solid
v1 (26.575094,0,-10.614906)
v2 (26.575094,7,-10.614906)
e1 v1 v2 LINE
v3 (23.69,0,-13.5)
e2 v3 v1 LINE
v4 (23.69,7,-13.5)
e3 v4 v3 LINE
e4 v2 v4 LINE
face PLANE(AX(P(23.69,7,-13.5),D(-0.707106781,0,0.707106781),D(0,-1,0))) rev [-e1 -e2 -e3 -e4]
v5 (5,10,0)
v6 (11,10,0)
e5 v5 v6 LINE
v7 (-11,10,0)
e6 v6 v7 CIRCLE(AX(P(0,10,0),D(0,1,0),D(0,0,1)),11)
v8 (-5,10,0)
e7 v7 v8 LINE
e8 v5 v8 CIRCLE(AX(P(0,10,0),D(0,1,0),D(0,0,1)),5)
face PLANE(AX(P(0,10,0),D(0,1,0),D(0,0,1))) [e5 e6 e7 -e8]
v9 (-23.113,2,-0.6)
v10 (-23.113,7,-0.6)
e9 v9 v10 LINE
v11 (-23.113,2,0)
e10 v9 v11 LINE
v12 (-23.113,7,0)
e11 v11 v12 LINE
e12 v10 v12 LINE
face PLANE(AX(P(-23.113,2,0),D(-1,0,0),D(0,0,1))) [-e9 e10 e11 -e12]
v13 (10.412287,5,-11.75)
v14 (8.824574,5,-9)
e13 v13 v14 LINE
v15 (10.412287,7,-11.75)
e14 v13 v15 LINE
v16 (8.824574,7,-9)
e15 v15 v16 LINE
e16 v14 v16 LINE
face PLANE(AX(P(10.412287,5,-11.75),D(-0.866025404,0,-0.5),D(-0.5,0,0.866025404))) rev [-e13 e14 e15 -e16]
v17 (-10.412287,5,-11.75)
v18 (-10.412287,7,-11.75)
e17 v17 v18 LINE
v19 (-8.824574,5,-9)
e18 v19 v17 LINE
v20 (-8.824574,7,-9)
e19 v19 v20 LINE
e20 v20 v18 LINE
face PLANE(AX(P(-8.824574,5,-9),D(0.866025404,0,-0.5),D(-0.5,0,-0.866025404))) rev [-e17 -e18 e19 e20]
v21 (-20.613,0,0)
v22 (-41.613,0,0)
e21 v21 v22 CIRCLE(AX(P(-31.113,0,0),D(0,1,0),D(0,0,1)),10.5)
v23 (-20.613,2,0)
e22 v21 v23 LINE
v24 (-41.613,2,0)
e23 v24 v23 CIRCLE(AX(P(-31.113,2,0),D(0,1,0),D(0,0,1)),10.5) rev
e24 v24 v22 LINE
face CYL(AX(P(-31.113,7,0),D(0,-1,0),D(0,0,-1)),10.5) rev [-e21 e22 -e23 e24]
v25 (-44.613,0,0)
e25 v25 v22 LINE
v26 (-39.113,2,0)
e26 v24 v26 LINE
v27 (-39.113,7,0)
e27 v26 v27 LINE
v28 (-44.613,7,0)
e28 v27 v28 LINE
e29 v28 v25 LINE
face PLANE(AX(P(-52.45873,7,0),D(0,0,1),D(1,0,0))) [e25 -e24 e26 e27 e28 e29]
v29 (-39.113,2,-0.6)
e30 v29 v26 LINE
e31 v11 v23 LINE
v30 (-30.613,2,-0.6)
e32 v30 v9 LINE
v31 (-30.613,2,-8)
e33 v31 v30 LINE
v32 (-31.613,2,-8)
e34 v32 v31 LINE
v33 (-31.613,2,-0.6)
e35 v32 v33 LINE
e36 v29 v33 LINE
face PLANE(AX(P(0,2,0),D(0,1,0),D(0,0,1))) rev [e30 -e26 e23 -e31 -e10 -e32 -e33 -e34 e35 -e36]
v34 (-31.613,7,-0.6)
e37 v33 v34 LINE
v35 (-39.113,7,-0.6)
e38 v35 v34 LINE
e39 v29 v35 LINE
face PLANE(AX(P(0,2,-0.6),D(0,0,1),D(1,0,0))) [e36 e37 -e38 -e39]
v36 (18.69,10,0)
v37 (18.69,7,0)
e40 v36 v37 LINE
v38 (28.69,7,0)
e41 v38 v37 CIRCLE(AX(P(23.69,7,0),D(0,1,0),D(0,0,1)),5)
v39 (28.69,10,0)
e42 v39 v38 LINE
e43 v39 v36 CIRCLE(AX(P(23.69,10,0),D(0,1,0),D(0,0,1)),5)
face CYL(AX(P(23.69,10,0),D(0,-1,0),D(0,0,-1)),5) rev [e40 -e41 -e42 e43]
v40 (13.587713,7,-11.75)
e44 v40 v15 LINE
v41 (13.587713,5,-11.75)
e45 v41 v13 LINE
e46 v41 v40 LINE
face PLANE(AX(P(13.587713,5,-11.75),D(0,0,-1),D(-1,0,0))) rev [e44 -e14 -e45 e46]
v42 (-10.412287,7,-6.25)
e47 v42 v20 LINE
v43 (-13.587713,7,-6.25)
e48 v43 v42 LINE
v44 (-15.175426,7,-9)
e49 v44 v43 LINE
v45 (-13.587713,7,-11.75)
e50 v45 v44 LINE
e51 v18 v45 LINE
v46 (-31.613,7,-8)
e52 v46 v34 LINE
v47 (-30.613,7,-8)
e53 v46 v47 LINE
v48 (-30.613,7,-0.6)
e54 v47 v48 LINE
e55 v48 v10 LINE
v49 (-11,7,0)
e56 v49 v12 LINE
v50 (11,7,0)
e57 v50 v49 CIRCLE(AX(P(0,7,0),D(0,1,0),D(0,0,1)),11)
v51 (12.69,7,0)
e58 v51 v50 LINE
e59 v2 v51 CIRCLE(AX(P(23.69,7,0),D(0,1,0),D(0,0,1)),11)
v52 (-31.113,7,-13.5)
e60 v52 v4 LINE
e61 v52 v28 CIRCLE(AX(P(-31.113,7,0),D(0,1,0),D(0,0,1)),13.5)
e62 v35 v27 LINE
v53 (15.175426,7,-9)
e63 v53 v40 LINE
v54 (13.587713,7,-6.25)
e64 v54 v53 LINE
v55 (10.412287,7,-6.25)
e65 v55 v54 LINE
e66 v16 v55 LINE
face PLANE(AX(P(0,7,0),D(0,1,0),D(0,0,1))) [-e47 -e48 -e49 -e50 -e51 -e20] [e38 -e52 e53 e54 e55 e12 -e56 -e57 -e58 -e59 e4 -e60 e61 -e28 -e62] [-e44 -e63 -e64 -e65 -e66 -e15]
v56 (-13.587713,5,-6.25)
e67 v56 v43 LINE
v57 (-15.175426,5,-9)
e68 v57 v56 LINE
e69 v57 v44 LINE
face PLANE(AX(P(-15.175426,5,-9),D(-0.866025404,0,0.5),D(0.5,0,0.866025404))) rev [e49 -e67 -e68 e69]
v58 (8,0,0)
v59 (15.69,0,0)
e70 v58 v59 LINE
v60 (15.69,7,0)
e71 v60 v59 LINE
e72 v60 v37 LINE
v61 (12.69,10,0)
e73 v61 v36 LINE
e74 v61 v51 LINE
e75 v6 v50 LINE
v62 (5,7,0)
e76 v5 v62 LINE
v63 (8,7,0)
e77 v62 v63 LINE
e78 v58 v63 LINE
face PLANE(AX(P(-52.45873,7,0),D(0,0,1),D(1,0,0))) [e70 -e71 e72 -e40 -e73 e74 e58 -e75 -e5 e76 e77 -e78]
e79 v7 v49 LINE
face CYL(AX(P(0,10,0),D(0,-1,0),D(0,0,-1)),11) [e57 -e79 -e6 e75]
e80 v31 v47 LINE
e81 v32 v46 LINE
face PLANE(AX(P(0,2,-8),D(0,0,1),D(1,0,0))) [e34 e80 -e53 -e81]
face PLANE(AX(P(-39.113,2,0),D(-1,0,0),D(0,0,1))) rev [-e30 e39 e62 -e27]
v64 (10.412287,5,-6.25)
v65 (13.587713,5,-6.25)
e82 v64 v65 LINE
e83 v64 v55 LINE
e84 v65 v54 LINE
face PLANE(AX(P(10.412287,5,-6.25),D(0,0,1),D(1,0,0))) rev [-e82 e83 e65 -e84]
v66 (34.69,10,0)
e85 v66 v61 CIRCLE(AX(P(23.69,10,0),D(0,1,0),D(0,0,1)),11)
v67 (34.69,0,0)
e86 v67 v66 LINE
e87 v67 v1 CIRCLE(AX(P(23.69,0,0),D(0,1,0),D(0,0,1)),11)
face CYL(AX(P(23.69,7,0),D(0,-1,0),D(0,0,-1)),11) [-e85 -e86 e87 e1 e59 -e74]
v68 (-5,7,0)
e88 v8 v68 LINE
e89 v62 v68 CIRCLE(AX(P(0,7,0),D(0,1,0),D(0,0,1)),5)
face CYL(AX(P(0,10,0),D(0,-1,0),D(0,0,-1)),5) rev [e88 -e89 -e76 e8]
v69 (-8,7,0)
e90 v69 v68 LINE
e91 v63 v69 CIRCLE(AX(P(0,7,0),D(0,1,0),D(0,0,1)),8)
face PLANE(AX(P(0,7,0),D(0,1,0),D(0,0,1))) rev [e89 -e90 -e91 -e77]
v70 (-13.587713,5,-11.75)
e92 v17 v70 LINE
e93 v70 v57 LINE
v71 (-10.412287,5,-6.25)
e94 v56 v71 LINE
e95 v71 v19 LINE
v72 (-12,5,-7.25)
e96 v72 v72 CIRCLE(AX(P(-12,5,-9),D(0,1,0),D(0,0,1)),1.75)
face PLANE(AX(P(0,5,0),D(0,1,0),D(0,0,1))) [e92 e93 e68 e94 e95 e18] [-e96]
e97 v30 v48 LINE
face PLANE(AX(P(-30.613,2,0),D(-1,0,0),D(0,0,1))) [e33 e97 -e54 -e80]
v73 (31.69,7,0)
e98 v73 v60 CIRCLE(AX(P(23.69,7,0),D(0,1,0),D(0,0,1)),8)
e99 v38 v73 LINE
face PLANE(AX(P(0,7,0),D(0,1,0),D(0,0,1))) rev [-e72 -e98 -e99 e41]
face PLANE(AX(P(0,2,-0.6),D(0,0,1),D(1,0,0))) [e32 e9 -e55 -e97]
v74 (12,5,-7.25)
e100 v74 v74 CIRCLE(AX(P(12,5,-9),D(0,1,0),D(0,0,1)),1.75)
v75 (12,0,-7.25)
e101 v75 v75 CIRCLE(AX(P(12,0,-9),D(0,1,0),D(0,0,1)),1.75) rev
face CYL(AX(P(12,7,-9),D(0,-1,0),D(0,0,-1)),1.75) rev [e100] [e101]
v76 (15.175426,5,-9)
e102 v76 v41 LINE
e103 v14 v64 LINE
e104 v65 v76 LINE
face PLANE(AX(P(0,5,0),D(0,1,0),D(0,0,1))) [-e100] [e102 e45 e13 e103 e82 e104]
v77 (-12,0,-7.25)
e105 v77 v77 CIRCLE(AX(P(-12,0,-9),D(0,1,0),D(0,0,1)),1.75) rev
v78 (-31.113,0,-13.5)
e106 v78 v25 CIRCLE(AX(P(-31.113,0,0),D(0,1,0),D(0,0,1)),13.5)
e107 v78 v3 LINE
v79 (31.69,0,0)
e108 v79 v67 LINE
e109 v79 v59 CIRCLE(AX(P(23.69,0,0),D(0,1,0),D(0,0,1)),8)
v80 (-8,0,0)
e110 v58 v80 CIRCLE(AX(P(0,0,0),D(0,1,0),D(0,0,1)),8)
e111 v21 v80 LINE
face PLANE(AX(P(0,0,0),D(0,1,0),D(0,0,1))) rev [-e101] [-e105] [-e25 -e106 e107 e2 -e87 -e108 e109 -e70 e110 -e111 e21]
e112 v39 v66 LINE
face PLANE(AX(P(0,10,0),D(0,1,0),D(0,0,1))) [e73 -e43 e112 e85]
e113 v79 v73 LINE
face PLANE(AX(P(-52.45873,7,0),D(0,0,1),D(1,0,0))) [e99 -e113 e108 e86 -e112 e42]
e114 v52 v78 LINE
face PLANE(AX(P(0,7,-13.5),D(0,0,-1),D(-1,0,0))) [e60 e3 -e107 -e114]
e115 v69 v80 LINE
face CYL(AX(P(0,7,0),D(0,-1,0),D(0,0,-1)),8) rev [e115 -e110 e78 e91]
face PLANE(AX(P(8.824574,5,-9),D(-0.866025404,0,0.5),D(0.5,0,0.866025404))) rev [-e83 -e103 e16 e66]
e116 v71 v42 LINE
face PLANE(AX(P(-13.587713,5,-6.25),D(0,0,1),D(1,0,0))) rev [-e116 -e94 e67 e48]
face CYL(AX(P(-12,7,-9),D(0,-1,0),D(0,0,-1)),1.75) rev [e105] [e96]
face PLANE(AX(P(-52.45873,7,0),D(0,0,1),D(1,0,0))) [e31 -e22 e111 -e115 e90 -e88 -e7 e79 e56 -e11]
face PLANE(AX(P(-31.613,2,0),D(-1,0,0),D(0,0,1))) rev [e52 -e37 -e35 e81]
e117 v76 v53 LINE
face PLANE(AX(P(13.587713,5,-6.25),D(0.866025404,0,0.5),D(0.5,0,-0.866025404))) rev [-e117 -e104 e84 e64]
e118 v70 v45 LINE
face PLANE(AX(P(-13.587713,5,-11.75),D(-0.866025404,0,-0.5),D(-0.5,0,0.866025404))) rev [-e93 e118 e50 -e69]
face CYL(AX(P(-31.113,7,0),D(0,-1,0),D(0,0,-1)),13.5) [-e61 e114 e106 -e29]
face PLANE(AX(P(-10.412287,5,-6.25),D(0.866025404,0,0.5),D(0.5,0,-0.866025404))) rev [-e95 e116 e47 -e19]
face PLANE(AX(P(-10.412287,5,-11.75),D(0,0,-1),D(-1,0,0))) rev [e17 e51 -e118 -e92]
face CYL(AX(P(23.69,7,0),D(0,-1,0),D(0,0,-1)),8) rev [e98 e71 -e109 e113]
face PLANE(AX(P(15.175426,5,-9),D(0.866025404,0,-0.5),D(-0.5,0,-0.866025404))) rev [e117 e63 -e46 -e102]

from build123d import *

# Parameters (mm, degrees)
SKETCH3_R               = 8
SKETCH3_W               = 54.803
SKETCH3_H               = 32
SKETCH3_R_2             = 5
BOSS_EXTRUDE1_DEPTH     = 7
CUT_EXTRUDE3_DEPTH      = 65.105926161
CUT_EXTRUDE3_DEPTH_BACK = 65.105926161
SKETCH4_R               = 1.75
CHAMFER1_SIZE           = 2.5
CUT_EXTRUDE5_DEPTH      = 65.105926161
CUT_EXTRUDE5_DEPTH_BACK = 65.105926161
SKETCH9_R               = 1.75
CUT_EXTRUDE6_START      = -2
SKETCH10_R              = 1.75
CUT_EXTRUDE6_DEPTH      = 2
CHAMFER3_SIZE2          = 22
CHAMFER3_SIZE           = 32
CHAMFER4_SIZE           = 16
FILLET1_DEPTH           = 7
BOSS_EXTRUDE6_START     = -5
SKETCH15_R              = 10.5
BOSS_EXTRUDE6_DEPTH     = 5
CUT_EXTRUDE7_DEPTH      = 65.105926161
CUT_EXTRUDE7_DEPTH_BACK = 65.105926161
SKETCH16_W              = 114.08603318
SKETCH16_H              = 61.147895568
BOSS_EXTRUDE7_DEPTH     = 3


with BuildPart() as part:
    # Sketch3 → Boss-Extrude1 (new body)
    # profile 1 of 10: a face of its own
    with BuildSketch(Plane(origin=(0, 0, 0), x_dir=(1, 0, 0), z_dir=(0, 1, 0))):
        with BuildLine():
            ThreePointArc((-17.613, 0), (-21.567058454, 9.545941546), (-31.113, 13.5))
            Line((-31.113, 13.5), (-31.113, 10.5))
            ThreePointArc((-31.113, 10.5), (-23.688378798, 7.424621202), (-20.613, 0))
            ThreePointArc((-20.613, 0), (-23.688378798, -7.424621202), (-31.113, -10.5))
            Line((-31.113, -10.5), (-31.113, -13.5))
            ThreePointArc((-31.113, -13.5), (-21.567058454, -9.545941546), (-17.613, 0))
        make_face()
    # profile 2 of 10: a face of its own
    with BuildSketch(Plane(origin=(0, 0, 0), x_dir=(1, 0, 0), z_dir=(0, 1, 0))):
        with BuildLine():
            Line((-31.113, 10.5), (-31.113, 13.5))
            ThreePointArc((-31.113, 13.5), (-44.613, 0), (-31.113, -13.5))
            Line((-31.113, -13.5), (-31.113, -10.5))
            ThreePointArc((-31.113, -10.5), (-41.613, 0), (-31.113, 10.5))
        make_face()
    # profile 3 of 10: a face of its own
    with BuildSketch(Plane(origin=(0, 0, 0), x_dir=(1, 0, 0), z_dir=(0, 1, 0))):
        with BuildLine():
            Line((23.69, 13.5), (-31.113, 13.5))
            ThreePointArc((-31.113, 13.5), (-21.567058454, 9.545941546), (-17.613, 0))
            ThreePointArc((-17.613, 0), (-21.567058454, -9.545941546), (-31.113, -13.5))
            Line((-31.113, -13.5), (23.69, -13.5))
            Line((23.69, -13.5), (23.69, -11))
            ThreePointArc((23.69, -11), (12.69, 0), (23.69, 11))
            Line((23.69, 11), (23.69, 13.5))
        make_face()
        with Locations(Location((0, 0, 0), (0, 0, 270))):
            Circle(SKETCH3_R, mode=Mode.SUBTRACT)
    # profile 4 of 10: a face of its own
    with BuildSketch(Plane(origin=(0, 0, 0), x_dir=(1, 0, 0), z_dir=(0, 1, 0))):
        with BuildLine():
            ThreePointArc((-17.613, 0), (-21.567058454, 9.545941546), (-31.113, 13.5))
            Line((-31.113, 13.5), (-31.113, 10.5))
            ThreePointArc((-31.113, 10.5), (-23.688378798, 7.424621202), (-20.613, 0))
            ThreePointArc((-20.613, 0), (-23.688378798, -7.424621202), (-31.113, -10.5))
            Line((-31.113, -10.5), (-31.113, -13.5))
            ThreePointArc((-31.113, -13.5), (-21.567058454, -9.545941546), (-17.613, 0))
        make_face()
    # profile 5 of 10: a face of its own
    with BuildSketch(Plane(origin=(0, 0, 0), x_dir=(1, 0, 0), z_dir=(0, 1, 0))):
        with BuildLine():
            Line((-31.113, 10.5), (-31.113, 13.5))
            ThreePointArc((-31.113, 13.5), (-44.613, 0), (-31.113, -13.5))
            Line((-31.113, -13.5), (-31.113, -10.5))
            ThreePointArc((-31.113, -10.5), (-41.613, 0), (-31.113, 10.5))
        make_face()
    # profile 6 of 10: a face of its own
    with BuildSketch(Plane(origin=(0, 0, 0), x_dir=(1, 0, 0), z_dir=(0, 1, 0))):
        with BuildLine():
            ThreePointArc((34.69, 0), (31.468174593, 7.778174593), (23.69, 11))
            Line((23.69, 11), (23.69, 8))
            ThreePointArc((23.69, 8), (29.346854249, 5.656854249), (31.69, 0))
            ThreePointArc((31.69, 0), (29.346854249, -5.656854249), (23.69, -8))
            Line((23.69, -8), (23.69, -11))
            ThreePointArc((23.69, -11), (31.468174593, -7.778174593), (34.69, 0))
        make_face()
    # profile 7 of 10: a face of its own
    with BuildSketch(Plane(origin=(0, 0, 0), x_dir=(1, 0, 0), z_dir=(0, 1, 0))):
        with BuildLine():
            Line((23.69, 8), (23.69, 11))
            ThreePointArc((23.69, 11), (12.69, 0), (23.69, -11))
            Line((23.69, -11), (23.69, -8))
            ThreePointArc((23.69, -8), (15.69, 0), (23.69, 8))
        make_face()
    # profile 8 of 10: a face of its own
    with BuildSketch(Plane(origin=(0, 0, 0), x_dir=(1, 0, 0), z_dir=(0, 1, 0))):
        with Locations((-3.7115, -29.5)):
            Rectangle(SKETCH3_W, SKETCH3_H)
        with Locations(Location((0, -32.707574931, 0), (0, 0, 270))):
            Circle(SKETCH3_R_2, mode=Mode.SUBTRACT)
    # profile 9 of 10: a face of its own
    with BuildSketch(Plane(origin=(0, 0, 0), x_dir=(1, 0, 0), z_dir=(0, 1, 0))):
        with BuildLine():
            ThreePointArc((34.69, 0), (31.468174593, 7.778174593), (23.69, 11))
            Line((23.69, 11), (23.69, 8))
            ThreePointArc((23.69, 8), (29.346854249, 5.656854249), (31.69, 0))
            ThreePointArc((31.69, 0), (29.346854249, -5.656854249), (23.69, -8))
            Line((23.69, -8), (23.69, -11))
            ThreePointArc((23.69, -11), (31.468174593, -7.778174593), (34.69, 0))
        make_face()
    # profile 10 of 10: a face of its own
    with BuildSketch(Plane(origin=(0, 0, 0), x_dir=(1, 0, 0), z_dir=(0, 1, 0))):
        with BuildLine():
            Line((23.69, 8), (23.69, 11))
            ThreePointArc((23.69, 11), (12.69, 0), (23.69, -11))
            Line((23.69, -11), (23.69, -8))
            ThreePointArc((23.69, -8), (15.69, 0), (23.69, 8))
        make_face()
    extrude(amount=BOSS_EXTRUDE1_DEPTH)

    # Sketch4 → Cut-Extrude3 (cut, two sides: drawn at the far end of the back side and taken through both)
    with BuildSketch(Plane(origin=(0, 0, 0), x_dir=(1, 0, 0), z_dir=(0, 1, 0)).offset(-CUT_EXTRUDE3_DEPTH_BACK)):
        with Locations(Location((5.5, -27.207574931, 0), (0, 0, 270))):
            Circle(SKETCH4_R)
        with Locations(Location((5.5, -38.207574931, 0), (0, 0, 270))):
            Circle(SKETCH4_R)
        with Locations(Location((-5.5, -38.207574931, 0), (0, 0, 270))):
            Circle(SKETCH4_R)
        with Locations(Location((-5.5, -27.207574931, 0), (0, 0, 270))):
            Circle(SKETCH4_R)
    extrude(amount=CUT_EXTRUDE3_DEPTH + CUT_EXTRUDE3_DEPTH_BACK, mode=Mode.SUBTRACT)

    # Chamfer1
    # the kernel refuses this chamfer: 2.5 mm, written as the material it adds along each edge
    with BuildSketch(Plane(origin=(23.69, 0, -11), x_dir=(0, 0, -1), z_dir=(0, 1, 0))) as chamfer1_piece_1_section:
        with BuildLine():
            Line((CHAMFER1_SIZE, 0), (-0.385093792, -2.885093792))
            ThreePointArc((-0.385093792, -2.885093792), (-0.102088007, -1.495163601), (0, 0))
            Line((0, 0), (CHAMFER1_SIZE, 0))
        make_face()
    chamfer1_piece_1 = extrude(amount=7, mode=Mode.PRIVATE)
    chamfer1_piece_1 = split(chamfer1_piece_1, bisect_by=Plane(origin=(23.69, 0, -13.5), z_dir=(0, 0, 1)), keep=Keep.TOP, mode=Mode.PRIVATE)
    add(chamfer1_piece_1)

    # Sketch9 → Cut-Extrude5 (cut, two sides: drawn at the far end of the back side and taken through both)
    with BuildSketch(Plane(origin=(0, 0, 0), x_dir=(1, 0, 0), z_dir=(0, 1, 0)).offset(-CUT_EXTRUDE5_DEPTH_BACK)):
        with Locations(Location((12, 9, 0), (0, 0, 270))):
            Circle(SKETCH9_R)
        with Locations(Location((12, -9, 0), (0, 0, 270))):
            Circle(SKETCH9_R)
        with Locations(Location((-12, -9, 0), (0, 0, 270))):
            Circle(SKETCH9_R)
        with Locations(Location((-12, 9, 0), (0, 0, 270))):
            Circle(SKETCH9_R)
    extrude(amount=CUT_EXTRUDE5_DEPTH + CUT_EXTRUDE5_DEPTH_BACK, mode=Mode.SUBTRACT)

    # Sketch10 → Cut-Extrude6 (cut)
    # profile 1 of 4: a face of its own
    with BuildSketch(Plane(origin=(0, 7, 0), x_dir=(1, 0, 0), z_dir=(0, 1, 0)).offset(CUT_EXTRUDE6_START)):
        Polygon((-15.175426481, -9), (-13.58771324, -11.75), (-10.41228676, -11.75), (-8.824573519, -9), (-10.41228676, -6.25), (-13.58771324, -6.25), align=None)
        with Locations(Location((-12, -9, 0), (0, 0, 270))):
            Circle(SKETCH10_R, mode=Mode.SUBTRACT)
    # profile 2 of 4: a face of its own
    with BuildSketch(Plane(origin=(0, 7, 0), x_dir=(1, 0, 0), z_dir=(0, 1, 0)).offset(CUT_EXTRUDE6_START)):
        Polygon((-15.175426481, 9), (-13.58771324, 6.25), (-10.41228676, 6.25), (-8.824573519, 9), (-10.41228676, 11.75), (-13.58771324, 11.75), align=None)
        with Locations(Location((-12, 9, 0), (0, 0, 270))):
            Circle(SKETCH10_R, mode=Mode.SUBTRACT)
    # profile 3 of 4: a face of its own
    with BuildSketch(Plane(origin=(0, 7, 0), x_dir=(1, 0, 0), z_dir=(0, 1, 0)).offset(CUT_EXTRUDE6_START)):
        Polygon((15.175426481, 9), (13.58771324, 11.75), (10.41228676, 11.75), (8.824573519, 9), (10.41228676, 6.25), (13.58771324, 6.25), align=None)
        with Locations(Location((12, 9, 0), (0, 0, 270))):
            Circle(SKETCH10_R, mode=Mode.SUBTRACT)
    # profile 4 of 4: a face of its own
    with BuildSketch(Plane(origin=(0, 7, 0), x_dir=(1, 0, 0), z_dir=(0, 1, 0)).offset(CUT_EXTRUDE6_START)):
        Polygon((15.175426481, -9), (13.58771324, -6.25), (10.41228676, -6.25), (8.824573519, -9), (10.41228676, -11.75), (13.58771324, -11.75), align=None)
        with Locations(Location((12, -9, 0), (0, 0, 270))):
            Circle(SKETCH10_R, mode=Mode.SUBTRACT)
    extrude(amount=CUT_EXTRUDE6_DEPTH, mode=Mode.SUBTRACT)

    # Chamfer2
    # the kernel refuses this chamfer: 5 mm, written as the material it adds along each edge
    with BuildSketch(Plane(origin=(23.69, 0, 11), x_dir=(0.9874000606639179, 0, -0.15824386307497393), z_dir=(0, 1, 0))) as chamfer2_piece_1:
        with BuildLine():
            Line((3.622786344, 0.141421356), (-0.805837357, -4.287202344))
            Line((-0.805837357, -4.287202344), (-0.904577363, -4.271377958))
            ThreePointArc((-0.904577363, -4.271377958), (-0.443767224, -2.137054655), (-0.098740006, 0.015824386))
            Line((-0.098740006, 0.015824386), (0.015824386, 0.098740006))
            ThreePointArc((0.015824386, 0.098740006), (1.81210794, -0.038365312), (3.606961958, 0.240161362))
            Line((3.606961958, 0.240161362), (3.622786344, 0.141421356))
        make_face()
    extrude(amount=7)

    # Chamfer3
    chamfer3_edges = [part.edges().sort_by_distance(p)[0] for p in [
        (-31.113, 3.5, 45.5),
    ]]
    chamfer3_side = [part.faces().sort_by_distance(p)[0] for p in [
        (-31.113, 3.5, 45.06),
    ]]
    chamfer(chamfer3_edges, length=CHAMFER3_SIZE - 0.0001, length2=CHAMFER3_SIZE2 - 0.0001, reference=chamfer3_side[0])  # a hair under: the kernel refuses the full size

    # Chamfer4
    chamfer4_edges = [part.edges().sort_by_distance(p)[0] for p in [
        (23.69, 3.5, 45.5),
    ]]
    chamfer(chamfer4_edges, length=CHAMFER4_SIZE)

    # Fillet1: read off the stored shape, not the designer's step
    # Fillet1 outline → Fillet1 (add)
    with BuildSketch(Plane(origin=(0, 0, 0), x_dir=(1, 0, 0), z_dir=(0, 1, 0))):
        with BuildLine():
            ThreePointArc((-31.113, -13.5), (-32.547033058, -13.423619079), (-33.96483904, -13.19534062))
            ThreePointArc((-33.96483904, -13.19534062), (-31.199410591, -14.370304214), (-29.062482337, -16.482571146))
            Line((-29.062482337, -16.482571146), (-31.113, -13.5))
        make_face()
    extrude(amount=FILLET1_DEPTH)

    # Sketch15 → Boss-Extrude6 (add)
    with BuildSketch(Plane(origin=(0, 7, 0), x_dir=(1, 0, 0), z_dir=(0, 1, 0)).offset(BOSS_EXTRUDE6_START)):
        with Locations(Location((-31.113, 0, 0), (0, 0, 270))):
            Circle(SKETCH15_R)
        Polygon((-31.613, 0.6), (-31.613, 8), (-30.613, 8), (-30.613, 0.6), (-23.113, 0.6), (-23.113, -0.6), (-30.613, -0.6), (-30.613, -8), (-31.613, -8), (-31.613, -0.6), (-39.113, -0.6), (-39.113, 0.6), align=None, mode=Mode.SUBTRACT)
    extrude(amount=BOSS_EXTRUDE6_DEPTH)

    # Sketch16 → Cut-Extrude7 (cut, two sides: drawn at the far end of the back side and taken through both)
    with BuildSketch(Plane(origin=(0, 0, 0), x_dir=(1, 0, 0), z_dir=(0, 1, 0)).offset(-CUT_EXTRUDE7_DEPTH_BACK)):
        with Locations((4.584286452, -30.573947784)):
            Rectangle(SKETCH16_W, SKETCH16_H)
    extrude(amount=CUT_EXTRUDE7_DEPTH + CUT_EXTRUDE7_DEPTH_BACK, mode=Mode.SUBTRACT)

    # Sketch17 → Boss-Extrude7 (add)
    with BuildSketch(Plane(origin=(0, 7, 0), x_dir=(1, 0, 0), z_dir=(0, 1, 0))):
        with BuildLine():
            ThreePointArc((-5, 0), (0, 5), (5, 0))
            Line((5, 0), (8, 0))
            ThreePointArc((8, 0), (0, 8), (-8, 0))
            Line((-8, 0), (-5, 0))
        make_face()
        with BuildLine():
            ThreePointArc((-8, 0), (0, 8), (8, 0))
            Line((8, 0), (11, 0))
            ThreePointArc((11, 0), (0, 11), (-11, 0))
            Line((-11, 0), (-8, 0))
        make_face()
        with BuildLine():
            ThreePointArc((31.69, 0), (23.69, 8), (15.69, 0))
            Line((15.69, 0), (18.69, 0))
            ThreePointArc((18.69, 0), (23.69, 5), (28.69, 0))
            Line((28.69, 0), (31.69, 0))
        make_face()
        with BuildLine():
            ThreePointArc((26.575093792, 10.614906208), (17.009282662, 8.738879554), (12.69, 0))
            Line((12.69, 0), (15.69, 0))
            ThreePointArc((15.69, 0), (23.69, 8), (31.69, 0))
            Line((31.69, 0), (34.69, 0))
            ThreePointArc((34.69, 0), (32.428879554, 6.680717338), (26.575093792, 10.614906208))
        make_face()
    extrude(amount=BOSS_EXTRUDE7_DEPTH)


solid = part.part
